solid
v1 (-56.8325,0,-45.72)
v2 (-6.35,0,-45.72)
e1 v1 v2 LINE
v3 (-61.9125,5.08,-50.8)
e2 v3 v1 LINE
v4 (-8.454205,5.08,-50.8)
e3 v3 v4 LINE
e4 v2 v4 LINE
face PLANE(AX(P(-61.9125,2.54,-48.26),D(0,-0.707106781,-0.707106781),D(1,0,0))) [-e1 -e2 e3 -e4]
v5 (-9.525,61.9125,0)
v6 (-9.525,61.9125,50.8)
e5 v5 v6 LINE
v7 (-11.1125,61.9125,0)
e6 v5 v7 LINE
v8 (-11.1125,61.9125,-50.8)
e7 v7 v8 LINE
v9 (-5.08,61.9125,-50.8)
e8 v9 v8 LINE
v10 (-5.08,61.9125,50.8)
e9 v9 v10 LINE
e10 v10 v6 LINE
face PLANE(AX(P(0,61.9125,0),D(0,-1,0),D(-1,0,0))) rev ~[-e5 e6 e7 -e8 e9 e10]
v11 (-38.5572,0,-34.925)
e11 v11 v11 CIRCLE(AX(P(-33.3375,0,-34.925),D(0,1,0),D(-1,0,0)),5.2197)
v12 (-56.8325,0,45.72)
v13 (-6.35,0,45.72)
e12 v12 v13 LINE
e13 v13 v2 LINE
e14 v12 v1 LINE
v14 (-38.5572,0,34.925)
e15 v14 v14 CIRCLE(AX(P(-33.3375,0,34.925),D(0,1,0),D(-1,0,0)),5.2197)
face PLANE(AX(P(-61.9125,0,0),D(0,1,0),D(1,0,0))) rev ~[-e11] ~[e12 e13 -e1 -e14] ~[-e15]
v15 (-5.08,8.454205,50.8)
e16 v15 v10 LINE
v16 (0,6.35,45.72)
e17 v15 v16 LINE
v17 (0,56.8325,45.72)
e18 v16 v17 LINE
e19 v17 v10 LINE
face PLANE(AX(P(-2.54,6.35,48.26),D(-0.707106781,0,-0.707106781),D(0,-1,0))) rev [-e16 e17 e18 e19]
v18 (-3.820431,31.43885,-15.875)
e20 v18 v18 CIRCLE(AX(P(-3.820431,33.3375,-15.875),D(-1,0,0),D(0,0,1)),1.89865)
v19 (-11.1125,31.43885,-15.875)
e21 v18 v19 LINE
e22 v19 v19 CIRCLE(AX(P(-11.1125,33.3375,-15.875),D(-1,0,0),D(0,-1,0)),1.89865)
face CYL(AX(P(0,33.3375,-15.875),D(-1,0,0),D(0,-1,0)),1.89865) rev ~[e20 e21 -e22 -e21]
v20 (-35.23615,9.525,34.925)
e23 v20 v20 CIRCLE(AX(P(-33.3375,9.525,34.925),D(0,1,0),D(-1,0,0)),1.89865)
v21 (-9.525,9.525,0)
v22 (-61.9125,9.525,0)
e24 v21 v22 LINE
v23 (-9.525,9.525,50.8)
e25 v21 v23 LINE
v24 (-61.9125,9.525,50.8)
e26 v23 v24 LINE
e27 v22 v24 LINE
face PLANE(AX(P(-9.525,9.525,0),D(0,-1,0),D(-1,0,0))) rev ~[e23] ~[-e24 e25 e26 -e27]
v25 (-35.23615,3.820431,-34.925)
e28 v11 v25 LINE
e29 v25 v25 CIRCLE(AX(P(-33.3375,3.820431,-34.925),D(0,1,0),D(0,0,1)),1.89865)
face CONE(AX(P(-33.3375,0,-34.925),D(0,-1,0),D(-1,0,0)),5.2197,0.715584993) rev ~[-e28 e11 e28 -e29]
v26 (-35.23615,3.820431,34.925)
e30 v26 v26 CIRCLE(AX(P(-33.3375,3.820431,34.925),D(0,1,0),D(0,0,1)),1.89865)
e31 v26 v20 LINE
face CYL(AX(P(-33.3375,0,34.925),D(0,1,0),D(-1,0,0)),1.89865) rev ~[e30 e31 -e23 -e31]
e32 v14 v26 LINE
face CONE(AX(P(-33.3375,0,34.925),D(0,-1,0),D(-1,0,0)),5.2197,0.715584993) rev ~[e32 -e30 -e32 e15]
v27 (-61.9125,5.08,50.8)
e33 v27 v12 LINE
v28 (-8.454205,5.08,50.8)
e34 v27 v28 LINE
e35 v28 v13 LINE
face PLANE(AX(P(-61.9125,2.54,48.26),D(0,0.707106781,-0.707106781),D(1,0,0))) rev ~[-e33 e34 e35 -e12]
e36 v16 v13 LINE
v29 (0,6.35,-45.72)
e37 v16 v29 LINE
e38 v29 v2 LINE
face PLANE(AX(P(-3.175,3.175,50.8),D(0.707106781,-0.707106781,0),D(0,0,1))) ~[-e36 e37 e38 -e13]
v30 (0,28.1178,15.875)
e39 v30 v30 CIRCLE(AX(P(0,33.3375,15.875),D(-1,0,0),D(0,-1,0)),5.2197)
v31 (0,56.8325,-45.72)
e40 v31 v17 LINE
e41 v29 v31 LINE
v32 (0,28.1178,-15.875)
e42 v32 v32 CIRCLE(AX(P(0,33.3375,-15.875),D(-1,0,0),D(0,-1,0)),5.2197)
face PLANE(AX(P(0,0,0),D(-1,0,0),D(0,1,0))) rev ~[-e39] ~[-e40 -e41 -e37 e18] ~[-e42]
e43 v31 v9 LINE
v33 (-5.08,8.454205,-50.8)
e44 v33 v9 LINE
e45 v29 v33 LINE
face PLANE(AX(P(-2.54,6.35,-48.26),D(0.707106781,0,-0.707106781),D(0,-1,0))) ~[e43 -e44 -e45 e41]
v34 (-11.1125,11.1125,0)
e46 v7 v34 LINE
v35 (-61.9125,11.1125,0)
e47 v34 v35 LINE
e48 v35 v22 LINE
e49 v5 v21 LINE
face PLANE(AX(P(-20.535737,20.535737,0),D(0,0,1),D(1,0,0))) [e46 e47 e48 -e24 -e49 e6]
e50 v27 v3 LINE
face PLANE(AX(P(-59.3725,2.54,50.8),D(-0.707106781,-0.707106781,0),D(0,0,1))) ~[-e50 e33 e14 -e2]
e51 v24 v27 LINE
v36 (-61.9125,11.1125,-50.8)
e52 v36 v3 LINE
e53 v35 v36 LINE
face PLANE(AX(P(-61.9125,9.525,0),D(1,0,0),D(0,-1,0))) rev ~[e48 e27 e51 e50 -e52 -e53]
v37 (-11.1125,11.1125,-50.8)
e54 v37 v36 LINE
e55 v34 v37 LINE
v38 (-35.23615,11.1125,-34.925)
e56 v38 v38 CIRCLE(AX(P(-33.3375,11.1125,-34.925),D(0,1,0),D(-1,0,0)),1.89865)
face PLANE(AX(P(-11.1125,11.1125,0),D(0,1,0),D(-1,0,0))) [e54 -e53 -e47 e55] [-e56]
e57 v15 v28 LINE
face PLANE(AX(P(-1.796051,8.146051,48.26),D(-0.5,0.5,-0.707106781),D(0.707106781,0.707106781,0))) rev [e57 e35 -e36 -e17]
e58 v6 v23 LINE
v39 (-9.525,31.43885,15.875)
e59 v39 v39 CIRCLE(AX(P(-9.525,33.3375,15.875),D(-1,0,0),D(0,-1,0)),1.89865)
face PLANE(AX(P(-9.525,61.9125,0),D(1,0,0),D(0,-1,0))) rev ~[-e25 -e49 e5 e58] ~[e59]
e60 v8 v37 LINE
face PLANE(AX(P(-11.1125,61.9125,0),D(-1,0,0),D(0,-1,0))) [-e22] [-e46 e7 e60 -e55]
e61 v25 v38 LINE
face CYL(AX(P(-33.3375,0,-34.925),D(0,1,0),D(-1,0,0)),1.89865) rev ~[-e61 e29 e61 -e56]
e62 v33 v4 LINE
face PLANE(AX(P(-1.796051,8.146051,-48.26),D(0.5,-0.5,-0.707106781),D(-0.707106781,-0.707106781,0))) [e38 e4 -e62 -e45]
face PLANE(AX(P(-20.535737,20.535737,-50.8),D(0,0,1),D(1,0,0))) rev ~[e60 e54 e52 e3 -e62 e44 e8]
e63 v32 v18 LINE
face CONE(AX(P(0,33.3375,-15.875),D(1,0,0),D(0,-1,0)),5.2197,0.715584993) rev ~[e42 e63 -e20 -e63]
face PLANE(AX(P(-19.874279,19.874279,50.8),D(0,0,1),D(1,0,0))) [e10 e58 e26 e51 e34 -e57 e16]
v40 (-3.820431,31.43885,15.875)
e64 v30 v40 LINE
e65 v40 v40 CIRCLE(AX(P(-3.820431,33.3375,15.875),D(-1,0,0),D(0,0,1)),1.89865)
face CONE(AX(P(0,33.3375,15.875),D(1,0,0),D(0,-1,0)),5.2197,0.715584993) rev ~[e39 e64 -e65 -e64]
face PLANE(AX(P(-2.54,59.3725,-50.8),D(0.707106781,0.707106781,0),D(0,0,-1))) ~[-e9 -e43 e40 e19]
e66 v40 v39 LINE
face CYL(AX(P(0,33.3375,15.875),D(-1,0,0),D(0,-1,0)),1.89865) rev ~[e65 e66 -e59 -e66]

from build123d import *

# Parameters (mm, degrees)
F1_DEPTH             = 50.8
F3_DEPTH             = 50.8
F6_D                 = 3.7973
F6_CSINK_D           = 10.4394
F6_CSINK_ANGLE       = 82
F6_ON_F5_D           = 3.7973
F6_ON_F5_CSINK_D     = 10.4394
F6_ON_F5_CSINK_ANGLE = 82
F7_SIZE              = 6.35
F9_SIZE              = 5.08


# Not quite as in the source:
# - a feature of the source that left no trace in its solid (it failed there, or was rolled back) is left out
# - a feature names something its author has since deleted; it is built from what else it names


with BuildPart() as f1:
    # F0 (on Top) → F1 (new body)
    with BuildSketch(Plane.XY):
        Polygon((-61.9125, 0), (0, 0), (0, 61.9125), (-11.1125, 61.9125), (-11.1125, 11.1125), (-61.9125, 11.1125), align=None)
    extrude(amount=-F1_DEPTH)

    # F2 (on face) → F3 (join)
    with BuildSketch(Plane.XY):
        Polygon((0, 0), (0, 61.9125), (-9.525, 61.9125), (-9.525, 9.525), (-61.9125, 9.525), (-61.9125, 0), align=None)
    extrude(amount=F3_DEPTH)

    # F6 (through all)
    with Locations(Plane.YZ):
        with Locations((33.3375, -15.875), (33.3375, 15.875)):
            CounterSinkHole(F6_D / 2, F6_CSINK_D / 2, counter_sink_angle=F6_CSINK_ANGLE)

    # F6 on F5 (through all)
    with Locations(Plane.XZ):
        with Locations((-33.3375, 34.925), (-33.3375, -34.925)):
            CounterSinkHole(F6_ON_F5_D / 2, F6_ON_F5_CSINK_D / 2, counter_sink_angle=F6_ON_F5_CSINK_ANGLE)

    # F7
    f7_edges = [f1.edges().sort_by_distance(p)[0] for p in [
        (0, 0, 0),
    ]]
    chamfer(f7_edges, length=F7_SIZE)

    # F9
    f9_edges = [f1.edges().sort_by_distance(p)[0] for p in [
        (-34.13125, 0, 50.8),
        (-3.175, 3.175, 50.8),
        (0, 34.13125, 50.8),
        (-3.175, 3.175, -50.8),
        (-34.13125, 0, -50.8),
        (0, 34.13125, -50.8),
        (-61.9125, 0, 0),
        (0, 61.9125, 0),
    ]]
    chamfer(f9_edges, length=F9_SIZE)


solid = f1.part
